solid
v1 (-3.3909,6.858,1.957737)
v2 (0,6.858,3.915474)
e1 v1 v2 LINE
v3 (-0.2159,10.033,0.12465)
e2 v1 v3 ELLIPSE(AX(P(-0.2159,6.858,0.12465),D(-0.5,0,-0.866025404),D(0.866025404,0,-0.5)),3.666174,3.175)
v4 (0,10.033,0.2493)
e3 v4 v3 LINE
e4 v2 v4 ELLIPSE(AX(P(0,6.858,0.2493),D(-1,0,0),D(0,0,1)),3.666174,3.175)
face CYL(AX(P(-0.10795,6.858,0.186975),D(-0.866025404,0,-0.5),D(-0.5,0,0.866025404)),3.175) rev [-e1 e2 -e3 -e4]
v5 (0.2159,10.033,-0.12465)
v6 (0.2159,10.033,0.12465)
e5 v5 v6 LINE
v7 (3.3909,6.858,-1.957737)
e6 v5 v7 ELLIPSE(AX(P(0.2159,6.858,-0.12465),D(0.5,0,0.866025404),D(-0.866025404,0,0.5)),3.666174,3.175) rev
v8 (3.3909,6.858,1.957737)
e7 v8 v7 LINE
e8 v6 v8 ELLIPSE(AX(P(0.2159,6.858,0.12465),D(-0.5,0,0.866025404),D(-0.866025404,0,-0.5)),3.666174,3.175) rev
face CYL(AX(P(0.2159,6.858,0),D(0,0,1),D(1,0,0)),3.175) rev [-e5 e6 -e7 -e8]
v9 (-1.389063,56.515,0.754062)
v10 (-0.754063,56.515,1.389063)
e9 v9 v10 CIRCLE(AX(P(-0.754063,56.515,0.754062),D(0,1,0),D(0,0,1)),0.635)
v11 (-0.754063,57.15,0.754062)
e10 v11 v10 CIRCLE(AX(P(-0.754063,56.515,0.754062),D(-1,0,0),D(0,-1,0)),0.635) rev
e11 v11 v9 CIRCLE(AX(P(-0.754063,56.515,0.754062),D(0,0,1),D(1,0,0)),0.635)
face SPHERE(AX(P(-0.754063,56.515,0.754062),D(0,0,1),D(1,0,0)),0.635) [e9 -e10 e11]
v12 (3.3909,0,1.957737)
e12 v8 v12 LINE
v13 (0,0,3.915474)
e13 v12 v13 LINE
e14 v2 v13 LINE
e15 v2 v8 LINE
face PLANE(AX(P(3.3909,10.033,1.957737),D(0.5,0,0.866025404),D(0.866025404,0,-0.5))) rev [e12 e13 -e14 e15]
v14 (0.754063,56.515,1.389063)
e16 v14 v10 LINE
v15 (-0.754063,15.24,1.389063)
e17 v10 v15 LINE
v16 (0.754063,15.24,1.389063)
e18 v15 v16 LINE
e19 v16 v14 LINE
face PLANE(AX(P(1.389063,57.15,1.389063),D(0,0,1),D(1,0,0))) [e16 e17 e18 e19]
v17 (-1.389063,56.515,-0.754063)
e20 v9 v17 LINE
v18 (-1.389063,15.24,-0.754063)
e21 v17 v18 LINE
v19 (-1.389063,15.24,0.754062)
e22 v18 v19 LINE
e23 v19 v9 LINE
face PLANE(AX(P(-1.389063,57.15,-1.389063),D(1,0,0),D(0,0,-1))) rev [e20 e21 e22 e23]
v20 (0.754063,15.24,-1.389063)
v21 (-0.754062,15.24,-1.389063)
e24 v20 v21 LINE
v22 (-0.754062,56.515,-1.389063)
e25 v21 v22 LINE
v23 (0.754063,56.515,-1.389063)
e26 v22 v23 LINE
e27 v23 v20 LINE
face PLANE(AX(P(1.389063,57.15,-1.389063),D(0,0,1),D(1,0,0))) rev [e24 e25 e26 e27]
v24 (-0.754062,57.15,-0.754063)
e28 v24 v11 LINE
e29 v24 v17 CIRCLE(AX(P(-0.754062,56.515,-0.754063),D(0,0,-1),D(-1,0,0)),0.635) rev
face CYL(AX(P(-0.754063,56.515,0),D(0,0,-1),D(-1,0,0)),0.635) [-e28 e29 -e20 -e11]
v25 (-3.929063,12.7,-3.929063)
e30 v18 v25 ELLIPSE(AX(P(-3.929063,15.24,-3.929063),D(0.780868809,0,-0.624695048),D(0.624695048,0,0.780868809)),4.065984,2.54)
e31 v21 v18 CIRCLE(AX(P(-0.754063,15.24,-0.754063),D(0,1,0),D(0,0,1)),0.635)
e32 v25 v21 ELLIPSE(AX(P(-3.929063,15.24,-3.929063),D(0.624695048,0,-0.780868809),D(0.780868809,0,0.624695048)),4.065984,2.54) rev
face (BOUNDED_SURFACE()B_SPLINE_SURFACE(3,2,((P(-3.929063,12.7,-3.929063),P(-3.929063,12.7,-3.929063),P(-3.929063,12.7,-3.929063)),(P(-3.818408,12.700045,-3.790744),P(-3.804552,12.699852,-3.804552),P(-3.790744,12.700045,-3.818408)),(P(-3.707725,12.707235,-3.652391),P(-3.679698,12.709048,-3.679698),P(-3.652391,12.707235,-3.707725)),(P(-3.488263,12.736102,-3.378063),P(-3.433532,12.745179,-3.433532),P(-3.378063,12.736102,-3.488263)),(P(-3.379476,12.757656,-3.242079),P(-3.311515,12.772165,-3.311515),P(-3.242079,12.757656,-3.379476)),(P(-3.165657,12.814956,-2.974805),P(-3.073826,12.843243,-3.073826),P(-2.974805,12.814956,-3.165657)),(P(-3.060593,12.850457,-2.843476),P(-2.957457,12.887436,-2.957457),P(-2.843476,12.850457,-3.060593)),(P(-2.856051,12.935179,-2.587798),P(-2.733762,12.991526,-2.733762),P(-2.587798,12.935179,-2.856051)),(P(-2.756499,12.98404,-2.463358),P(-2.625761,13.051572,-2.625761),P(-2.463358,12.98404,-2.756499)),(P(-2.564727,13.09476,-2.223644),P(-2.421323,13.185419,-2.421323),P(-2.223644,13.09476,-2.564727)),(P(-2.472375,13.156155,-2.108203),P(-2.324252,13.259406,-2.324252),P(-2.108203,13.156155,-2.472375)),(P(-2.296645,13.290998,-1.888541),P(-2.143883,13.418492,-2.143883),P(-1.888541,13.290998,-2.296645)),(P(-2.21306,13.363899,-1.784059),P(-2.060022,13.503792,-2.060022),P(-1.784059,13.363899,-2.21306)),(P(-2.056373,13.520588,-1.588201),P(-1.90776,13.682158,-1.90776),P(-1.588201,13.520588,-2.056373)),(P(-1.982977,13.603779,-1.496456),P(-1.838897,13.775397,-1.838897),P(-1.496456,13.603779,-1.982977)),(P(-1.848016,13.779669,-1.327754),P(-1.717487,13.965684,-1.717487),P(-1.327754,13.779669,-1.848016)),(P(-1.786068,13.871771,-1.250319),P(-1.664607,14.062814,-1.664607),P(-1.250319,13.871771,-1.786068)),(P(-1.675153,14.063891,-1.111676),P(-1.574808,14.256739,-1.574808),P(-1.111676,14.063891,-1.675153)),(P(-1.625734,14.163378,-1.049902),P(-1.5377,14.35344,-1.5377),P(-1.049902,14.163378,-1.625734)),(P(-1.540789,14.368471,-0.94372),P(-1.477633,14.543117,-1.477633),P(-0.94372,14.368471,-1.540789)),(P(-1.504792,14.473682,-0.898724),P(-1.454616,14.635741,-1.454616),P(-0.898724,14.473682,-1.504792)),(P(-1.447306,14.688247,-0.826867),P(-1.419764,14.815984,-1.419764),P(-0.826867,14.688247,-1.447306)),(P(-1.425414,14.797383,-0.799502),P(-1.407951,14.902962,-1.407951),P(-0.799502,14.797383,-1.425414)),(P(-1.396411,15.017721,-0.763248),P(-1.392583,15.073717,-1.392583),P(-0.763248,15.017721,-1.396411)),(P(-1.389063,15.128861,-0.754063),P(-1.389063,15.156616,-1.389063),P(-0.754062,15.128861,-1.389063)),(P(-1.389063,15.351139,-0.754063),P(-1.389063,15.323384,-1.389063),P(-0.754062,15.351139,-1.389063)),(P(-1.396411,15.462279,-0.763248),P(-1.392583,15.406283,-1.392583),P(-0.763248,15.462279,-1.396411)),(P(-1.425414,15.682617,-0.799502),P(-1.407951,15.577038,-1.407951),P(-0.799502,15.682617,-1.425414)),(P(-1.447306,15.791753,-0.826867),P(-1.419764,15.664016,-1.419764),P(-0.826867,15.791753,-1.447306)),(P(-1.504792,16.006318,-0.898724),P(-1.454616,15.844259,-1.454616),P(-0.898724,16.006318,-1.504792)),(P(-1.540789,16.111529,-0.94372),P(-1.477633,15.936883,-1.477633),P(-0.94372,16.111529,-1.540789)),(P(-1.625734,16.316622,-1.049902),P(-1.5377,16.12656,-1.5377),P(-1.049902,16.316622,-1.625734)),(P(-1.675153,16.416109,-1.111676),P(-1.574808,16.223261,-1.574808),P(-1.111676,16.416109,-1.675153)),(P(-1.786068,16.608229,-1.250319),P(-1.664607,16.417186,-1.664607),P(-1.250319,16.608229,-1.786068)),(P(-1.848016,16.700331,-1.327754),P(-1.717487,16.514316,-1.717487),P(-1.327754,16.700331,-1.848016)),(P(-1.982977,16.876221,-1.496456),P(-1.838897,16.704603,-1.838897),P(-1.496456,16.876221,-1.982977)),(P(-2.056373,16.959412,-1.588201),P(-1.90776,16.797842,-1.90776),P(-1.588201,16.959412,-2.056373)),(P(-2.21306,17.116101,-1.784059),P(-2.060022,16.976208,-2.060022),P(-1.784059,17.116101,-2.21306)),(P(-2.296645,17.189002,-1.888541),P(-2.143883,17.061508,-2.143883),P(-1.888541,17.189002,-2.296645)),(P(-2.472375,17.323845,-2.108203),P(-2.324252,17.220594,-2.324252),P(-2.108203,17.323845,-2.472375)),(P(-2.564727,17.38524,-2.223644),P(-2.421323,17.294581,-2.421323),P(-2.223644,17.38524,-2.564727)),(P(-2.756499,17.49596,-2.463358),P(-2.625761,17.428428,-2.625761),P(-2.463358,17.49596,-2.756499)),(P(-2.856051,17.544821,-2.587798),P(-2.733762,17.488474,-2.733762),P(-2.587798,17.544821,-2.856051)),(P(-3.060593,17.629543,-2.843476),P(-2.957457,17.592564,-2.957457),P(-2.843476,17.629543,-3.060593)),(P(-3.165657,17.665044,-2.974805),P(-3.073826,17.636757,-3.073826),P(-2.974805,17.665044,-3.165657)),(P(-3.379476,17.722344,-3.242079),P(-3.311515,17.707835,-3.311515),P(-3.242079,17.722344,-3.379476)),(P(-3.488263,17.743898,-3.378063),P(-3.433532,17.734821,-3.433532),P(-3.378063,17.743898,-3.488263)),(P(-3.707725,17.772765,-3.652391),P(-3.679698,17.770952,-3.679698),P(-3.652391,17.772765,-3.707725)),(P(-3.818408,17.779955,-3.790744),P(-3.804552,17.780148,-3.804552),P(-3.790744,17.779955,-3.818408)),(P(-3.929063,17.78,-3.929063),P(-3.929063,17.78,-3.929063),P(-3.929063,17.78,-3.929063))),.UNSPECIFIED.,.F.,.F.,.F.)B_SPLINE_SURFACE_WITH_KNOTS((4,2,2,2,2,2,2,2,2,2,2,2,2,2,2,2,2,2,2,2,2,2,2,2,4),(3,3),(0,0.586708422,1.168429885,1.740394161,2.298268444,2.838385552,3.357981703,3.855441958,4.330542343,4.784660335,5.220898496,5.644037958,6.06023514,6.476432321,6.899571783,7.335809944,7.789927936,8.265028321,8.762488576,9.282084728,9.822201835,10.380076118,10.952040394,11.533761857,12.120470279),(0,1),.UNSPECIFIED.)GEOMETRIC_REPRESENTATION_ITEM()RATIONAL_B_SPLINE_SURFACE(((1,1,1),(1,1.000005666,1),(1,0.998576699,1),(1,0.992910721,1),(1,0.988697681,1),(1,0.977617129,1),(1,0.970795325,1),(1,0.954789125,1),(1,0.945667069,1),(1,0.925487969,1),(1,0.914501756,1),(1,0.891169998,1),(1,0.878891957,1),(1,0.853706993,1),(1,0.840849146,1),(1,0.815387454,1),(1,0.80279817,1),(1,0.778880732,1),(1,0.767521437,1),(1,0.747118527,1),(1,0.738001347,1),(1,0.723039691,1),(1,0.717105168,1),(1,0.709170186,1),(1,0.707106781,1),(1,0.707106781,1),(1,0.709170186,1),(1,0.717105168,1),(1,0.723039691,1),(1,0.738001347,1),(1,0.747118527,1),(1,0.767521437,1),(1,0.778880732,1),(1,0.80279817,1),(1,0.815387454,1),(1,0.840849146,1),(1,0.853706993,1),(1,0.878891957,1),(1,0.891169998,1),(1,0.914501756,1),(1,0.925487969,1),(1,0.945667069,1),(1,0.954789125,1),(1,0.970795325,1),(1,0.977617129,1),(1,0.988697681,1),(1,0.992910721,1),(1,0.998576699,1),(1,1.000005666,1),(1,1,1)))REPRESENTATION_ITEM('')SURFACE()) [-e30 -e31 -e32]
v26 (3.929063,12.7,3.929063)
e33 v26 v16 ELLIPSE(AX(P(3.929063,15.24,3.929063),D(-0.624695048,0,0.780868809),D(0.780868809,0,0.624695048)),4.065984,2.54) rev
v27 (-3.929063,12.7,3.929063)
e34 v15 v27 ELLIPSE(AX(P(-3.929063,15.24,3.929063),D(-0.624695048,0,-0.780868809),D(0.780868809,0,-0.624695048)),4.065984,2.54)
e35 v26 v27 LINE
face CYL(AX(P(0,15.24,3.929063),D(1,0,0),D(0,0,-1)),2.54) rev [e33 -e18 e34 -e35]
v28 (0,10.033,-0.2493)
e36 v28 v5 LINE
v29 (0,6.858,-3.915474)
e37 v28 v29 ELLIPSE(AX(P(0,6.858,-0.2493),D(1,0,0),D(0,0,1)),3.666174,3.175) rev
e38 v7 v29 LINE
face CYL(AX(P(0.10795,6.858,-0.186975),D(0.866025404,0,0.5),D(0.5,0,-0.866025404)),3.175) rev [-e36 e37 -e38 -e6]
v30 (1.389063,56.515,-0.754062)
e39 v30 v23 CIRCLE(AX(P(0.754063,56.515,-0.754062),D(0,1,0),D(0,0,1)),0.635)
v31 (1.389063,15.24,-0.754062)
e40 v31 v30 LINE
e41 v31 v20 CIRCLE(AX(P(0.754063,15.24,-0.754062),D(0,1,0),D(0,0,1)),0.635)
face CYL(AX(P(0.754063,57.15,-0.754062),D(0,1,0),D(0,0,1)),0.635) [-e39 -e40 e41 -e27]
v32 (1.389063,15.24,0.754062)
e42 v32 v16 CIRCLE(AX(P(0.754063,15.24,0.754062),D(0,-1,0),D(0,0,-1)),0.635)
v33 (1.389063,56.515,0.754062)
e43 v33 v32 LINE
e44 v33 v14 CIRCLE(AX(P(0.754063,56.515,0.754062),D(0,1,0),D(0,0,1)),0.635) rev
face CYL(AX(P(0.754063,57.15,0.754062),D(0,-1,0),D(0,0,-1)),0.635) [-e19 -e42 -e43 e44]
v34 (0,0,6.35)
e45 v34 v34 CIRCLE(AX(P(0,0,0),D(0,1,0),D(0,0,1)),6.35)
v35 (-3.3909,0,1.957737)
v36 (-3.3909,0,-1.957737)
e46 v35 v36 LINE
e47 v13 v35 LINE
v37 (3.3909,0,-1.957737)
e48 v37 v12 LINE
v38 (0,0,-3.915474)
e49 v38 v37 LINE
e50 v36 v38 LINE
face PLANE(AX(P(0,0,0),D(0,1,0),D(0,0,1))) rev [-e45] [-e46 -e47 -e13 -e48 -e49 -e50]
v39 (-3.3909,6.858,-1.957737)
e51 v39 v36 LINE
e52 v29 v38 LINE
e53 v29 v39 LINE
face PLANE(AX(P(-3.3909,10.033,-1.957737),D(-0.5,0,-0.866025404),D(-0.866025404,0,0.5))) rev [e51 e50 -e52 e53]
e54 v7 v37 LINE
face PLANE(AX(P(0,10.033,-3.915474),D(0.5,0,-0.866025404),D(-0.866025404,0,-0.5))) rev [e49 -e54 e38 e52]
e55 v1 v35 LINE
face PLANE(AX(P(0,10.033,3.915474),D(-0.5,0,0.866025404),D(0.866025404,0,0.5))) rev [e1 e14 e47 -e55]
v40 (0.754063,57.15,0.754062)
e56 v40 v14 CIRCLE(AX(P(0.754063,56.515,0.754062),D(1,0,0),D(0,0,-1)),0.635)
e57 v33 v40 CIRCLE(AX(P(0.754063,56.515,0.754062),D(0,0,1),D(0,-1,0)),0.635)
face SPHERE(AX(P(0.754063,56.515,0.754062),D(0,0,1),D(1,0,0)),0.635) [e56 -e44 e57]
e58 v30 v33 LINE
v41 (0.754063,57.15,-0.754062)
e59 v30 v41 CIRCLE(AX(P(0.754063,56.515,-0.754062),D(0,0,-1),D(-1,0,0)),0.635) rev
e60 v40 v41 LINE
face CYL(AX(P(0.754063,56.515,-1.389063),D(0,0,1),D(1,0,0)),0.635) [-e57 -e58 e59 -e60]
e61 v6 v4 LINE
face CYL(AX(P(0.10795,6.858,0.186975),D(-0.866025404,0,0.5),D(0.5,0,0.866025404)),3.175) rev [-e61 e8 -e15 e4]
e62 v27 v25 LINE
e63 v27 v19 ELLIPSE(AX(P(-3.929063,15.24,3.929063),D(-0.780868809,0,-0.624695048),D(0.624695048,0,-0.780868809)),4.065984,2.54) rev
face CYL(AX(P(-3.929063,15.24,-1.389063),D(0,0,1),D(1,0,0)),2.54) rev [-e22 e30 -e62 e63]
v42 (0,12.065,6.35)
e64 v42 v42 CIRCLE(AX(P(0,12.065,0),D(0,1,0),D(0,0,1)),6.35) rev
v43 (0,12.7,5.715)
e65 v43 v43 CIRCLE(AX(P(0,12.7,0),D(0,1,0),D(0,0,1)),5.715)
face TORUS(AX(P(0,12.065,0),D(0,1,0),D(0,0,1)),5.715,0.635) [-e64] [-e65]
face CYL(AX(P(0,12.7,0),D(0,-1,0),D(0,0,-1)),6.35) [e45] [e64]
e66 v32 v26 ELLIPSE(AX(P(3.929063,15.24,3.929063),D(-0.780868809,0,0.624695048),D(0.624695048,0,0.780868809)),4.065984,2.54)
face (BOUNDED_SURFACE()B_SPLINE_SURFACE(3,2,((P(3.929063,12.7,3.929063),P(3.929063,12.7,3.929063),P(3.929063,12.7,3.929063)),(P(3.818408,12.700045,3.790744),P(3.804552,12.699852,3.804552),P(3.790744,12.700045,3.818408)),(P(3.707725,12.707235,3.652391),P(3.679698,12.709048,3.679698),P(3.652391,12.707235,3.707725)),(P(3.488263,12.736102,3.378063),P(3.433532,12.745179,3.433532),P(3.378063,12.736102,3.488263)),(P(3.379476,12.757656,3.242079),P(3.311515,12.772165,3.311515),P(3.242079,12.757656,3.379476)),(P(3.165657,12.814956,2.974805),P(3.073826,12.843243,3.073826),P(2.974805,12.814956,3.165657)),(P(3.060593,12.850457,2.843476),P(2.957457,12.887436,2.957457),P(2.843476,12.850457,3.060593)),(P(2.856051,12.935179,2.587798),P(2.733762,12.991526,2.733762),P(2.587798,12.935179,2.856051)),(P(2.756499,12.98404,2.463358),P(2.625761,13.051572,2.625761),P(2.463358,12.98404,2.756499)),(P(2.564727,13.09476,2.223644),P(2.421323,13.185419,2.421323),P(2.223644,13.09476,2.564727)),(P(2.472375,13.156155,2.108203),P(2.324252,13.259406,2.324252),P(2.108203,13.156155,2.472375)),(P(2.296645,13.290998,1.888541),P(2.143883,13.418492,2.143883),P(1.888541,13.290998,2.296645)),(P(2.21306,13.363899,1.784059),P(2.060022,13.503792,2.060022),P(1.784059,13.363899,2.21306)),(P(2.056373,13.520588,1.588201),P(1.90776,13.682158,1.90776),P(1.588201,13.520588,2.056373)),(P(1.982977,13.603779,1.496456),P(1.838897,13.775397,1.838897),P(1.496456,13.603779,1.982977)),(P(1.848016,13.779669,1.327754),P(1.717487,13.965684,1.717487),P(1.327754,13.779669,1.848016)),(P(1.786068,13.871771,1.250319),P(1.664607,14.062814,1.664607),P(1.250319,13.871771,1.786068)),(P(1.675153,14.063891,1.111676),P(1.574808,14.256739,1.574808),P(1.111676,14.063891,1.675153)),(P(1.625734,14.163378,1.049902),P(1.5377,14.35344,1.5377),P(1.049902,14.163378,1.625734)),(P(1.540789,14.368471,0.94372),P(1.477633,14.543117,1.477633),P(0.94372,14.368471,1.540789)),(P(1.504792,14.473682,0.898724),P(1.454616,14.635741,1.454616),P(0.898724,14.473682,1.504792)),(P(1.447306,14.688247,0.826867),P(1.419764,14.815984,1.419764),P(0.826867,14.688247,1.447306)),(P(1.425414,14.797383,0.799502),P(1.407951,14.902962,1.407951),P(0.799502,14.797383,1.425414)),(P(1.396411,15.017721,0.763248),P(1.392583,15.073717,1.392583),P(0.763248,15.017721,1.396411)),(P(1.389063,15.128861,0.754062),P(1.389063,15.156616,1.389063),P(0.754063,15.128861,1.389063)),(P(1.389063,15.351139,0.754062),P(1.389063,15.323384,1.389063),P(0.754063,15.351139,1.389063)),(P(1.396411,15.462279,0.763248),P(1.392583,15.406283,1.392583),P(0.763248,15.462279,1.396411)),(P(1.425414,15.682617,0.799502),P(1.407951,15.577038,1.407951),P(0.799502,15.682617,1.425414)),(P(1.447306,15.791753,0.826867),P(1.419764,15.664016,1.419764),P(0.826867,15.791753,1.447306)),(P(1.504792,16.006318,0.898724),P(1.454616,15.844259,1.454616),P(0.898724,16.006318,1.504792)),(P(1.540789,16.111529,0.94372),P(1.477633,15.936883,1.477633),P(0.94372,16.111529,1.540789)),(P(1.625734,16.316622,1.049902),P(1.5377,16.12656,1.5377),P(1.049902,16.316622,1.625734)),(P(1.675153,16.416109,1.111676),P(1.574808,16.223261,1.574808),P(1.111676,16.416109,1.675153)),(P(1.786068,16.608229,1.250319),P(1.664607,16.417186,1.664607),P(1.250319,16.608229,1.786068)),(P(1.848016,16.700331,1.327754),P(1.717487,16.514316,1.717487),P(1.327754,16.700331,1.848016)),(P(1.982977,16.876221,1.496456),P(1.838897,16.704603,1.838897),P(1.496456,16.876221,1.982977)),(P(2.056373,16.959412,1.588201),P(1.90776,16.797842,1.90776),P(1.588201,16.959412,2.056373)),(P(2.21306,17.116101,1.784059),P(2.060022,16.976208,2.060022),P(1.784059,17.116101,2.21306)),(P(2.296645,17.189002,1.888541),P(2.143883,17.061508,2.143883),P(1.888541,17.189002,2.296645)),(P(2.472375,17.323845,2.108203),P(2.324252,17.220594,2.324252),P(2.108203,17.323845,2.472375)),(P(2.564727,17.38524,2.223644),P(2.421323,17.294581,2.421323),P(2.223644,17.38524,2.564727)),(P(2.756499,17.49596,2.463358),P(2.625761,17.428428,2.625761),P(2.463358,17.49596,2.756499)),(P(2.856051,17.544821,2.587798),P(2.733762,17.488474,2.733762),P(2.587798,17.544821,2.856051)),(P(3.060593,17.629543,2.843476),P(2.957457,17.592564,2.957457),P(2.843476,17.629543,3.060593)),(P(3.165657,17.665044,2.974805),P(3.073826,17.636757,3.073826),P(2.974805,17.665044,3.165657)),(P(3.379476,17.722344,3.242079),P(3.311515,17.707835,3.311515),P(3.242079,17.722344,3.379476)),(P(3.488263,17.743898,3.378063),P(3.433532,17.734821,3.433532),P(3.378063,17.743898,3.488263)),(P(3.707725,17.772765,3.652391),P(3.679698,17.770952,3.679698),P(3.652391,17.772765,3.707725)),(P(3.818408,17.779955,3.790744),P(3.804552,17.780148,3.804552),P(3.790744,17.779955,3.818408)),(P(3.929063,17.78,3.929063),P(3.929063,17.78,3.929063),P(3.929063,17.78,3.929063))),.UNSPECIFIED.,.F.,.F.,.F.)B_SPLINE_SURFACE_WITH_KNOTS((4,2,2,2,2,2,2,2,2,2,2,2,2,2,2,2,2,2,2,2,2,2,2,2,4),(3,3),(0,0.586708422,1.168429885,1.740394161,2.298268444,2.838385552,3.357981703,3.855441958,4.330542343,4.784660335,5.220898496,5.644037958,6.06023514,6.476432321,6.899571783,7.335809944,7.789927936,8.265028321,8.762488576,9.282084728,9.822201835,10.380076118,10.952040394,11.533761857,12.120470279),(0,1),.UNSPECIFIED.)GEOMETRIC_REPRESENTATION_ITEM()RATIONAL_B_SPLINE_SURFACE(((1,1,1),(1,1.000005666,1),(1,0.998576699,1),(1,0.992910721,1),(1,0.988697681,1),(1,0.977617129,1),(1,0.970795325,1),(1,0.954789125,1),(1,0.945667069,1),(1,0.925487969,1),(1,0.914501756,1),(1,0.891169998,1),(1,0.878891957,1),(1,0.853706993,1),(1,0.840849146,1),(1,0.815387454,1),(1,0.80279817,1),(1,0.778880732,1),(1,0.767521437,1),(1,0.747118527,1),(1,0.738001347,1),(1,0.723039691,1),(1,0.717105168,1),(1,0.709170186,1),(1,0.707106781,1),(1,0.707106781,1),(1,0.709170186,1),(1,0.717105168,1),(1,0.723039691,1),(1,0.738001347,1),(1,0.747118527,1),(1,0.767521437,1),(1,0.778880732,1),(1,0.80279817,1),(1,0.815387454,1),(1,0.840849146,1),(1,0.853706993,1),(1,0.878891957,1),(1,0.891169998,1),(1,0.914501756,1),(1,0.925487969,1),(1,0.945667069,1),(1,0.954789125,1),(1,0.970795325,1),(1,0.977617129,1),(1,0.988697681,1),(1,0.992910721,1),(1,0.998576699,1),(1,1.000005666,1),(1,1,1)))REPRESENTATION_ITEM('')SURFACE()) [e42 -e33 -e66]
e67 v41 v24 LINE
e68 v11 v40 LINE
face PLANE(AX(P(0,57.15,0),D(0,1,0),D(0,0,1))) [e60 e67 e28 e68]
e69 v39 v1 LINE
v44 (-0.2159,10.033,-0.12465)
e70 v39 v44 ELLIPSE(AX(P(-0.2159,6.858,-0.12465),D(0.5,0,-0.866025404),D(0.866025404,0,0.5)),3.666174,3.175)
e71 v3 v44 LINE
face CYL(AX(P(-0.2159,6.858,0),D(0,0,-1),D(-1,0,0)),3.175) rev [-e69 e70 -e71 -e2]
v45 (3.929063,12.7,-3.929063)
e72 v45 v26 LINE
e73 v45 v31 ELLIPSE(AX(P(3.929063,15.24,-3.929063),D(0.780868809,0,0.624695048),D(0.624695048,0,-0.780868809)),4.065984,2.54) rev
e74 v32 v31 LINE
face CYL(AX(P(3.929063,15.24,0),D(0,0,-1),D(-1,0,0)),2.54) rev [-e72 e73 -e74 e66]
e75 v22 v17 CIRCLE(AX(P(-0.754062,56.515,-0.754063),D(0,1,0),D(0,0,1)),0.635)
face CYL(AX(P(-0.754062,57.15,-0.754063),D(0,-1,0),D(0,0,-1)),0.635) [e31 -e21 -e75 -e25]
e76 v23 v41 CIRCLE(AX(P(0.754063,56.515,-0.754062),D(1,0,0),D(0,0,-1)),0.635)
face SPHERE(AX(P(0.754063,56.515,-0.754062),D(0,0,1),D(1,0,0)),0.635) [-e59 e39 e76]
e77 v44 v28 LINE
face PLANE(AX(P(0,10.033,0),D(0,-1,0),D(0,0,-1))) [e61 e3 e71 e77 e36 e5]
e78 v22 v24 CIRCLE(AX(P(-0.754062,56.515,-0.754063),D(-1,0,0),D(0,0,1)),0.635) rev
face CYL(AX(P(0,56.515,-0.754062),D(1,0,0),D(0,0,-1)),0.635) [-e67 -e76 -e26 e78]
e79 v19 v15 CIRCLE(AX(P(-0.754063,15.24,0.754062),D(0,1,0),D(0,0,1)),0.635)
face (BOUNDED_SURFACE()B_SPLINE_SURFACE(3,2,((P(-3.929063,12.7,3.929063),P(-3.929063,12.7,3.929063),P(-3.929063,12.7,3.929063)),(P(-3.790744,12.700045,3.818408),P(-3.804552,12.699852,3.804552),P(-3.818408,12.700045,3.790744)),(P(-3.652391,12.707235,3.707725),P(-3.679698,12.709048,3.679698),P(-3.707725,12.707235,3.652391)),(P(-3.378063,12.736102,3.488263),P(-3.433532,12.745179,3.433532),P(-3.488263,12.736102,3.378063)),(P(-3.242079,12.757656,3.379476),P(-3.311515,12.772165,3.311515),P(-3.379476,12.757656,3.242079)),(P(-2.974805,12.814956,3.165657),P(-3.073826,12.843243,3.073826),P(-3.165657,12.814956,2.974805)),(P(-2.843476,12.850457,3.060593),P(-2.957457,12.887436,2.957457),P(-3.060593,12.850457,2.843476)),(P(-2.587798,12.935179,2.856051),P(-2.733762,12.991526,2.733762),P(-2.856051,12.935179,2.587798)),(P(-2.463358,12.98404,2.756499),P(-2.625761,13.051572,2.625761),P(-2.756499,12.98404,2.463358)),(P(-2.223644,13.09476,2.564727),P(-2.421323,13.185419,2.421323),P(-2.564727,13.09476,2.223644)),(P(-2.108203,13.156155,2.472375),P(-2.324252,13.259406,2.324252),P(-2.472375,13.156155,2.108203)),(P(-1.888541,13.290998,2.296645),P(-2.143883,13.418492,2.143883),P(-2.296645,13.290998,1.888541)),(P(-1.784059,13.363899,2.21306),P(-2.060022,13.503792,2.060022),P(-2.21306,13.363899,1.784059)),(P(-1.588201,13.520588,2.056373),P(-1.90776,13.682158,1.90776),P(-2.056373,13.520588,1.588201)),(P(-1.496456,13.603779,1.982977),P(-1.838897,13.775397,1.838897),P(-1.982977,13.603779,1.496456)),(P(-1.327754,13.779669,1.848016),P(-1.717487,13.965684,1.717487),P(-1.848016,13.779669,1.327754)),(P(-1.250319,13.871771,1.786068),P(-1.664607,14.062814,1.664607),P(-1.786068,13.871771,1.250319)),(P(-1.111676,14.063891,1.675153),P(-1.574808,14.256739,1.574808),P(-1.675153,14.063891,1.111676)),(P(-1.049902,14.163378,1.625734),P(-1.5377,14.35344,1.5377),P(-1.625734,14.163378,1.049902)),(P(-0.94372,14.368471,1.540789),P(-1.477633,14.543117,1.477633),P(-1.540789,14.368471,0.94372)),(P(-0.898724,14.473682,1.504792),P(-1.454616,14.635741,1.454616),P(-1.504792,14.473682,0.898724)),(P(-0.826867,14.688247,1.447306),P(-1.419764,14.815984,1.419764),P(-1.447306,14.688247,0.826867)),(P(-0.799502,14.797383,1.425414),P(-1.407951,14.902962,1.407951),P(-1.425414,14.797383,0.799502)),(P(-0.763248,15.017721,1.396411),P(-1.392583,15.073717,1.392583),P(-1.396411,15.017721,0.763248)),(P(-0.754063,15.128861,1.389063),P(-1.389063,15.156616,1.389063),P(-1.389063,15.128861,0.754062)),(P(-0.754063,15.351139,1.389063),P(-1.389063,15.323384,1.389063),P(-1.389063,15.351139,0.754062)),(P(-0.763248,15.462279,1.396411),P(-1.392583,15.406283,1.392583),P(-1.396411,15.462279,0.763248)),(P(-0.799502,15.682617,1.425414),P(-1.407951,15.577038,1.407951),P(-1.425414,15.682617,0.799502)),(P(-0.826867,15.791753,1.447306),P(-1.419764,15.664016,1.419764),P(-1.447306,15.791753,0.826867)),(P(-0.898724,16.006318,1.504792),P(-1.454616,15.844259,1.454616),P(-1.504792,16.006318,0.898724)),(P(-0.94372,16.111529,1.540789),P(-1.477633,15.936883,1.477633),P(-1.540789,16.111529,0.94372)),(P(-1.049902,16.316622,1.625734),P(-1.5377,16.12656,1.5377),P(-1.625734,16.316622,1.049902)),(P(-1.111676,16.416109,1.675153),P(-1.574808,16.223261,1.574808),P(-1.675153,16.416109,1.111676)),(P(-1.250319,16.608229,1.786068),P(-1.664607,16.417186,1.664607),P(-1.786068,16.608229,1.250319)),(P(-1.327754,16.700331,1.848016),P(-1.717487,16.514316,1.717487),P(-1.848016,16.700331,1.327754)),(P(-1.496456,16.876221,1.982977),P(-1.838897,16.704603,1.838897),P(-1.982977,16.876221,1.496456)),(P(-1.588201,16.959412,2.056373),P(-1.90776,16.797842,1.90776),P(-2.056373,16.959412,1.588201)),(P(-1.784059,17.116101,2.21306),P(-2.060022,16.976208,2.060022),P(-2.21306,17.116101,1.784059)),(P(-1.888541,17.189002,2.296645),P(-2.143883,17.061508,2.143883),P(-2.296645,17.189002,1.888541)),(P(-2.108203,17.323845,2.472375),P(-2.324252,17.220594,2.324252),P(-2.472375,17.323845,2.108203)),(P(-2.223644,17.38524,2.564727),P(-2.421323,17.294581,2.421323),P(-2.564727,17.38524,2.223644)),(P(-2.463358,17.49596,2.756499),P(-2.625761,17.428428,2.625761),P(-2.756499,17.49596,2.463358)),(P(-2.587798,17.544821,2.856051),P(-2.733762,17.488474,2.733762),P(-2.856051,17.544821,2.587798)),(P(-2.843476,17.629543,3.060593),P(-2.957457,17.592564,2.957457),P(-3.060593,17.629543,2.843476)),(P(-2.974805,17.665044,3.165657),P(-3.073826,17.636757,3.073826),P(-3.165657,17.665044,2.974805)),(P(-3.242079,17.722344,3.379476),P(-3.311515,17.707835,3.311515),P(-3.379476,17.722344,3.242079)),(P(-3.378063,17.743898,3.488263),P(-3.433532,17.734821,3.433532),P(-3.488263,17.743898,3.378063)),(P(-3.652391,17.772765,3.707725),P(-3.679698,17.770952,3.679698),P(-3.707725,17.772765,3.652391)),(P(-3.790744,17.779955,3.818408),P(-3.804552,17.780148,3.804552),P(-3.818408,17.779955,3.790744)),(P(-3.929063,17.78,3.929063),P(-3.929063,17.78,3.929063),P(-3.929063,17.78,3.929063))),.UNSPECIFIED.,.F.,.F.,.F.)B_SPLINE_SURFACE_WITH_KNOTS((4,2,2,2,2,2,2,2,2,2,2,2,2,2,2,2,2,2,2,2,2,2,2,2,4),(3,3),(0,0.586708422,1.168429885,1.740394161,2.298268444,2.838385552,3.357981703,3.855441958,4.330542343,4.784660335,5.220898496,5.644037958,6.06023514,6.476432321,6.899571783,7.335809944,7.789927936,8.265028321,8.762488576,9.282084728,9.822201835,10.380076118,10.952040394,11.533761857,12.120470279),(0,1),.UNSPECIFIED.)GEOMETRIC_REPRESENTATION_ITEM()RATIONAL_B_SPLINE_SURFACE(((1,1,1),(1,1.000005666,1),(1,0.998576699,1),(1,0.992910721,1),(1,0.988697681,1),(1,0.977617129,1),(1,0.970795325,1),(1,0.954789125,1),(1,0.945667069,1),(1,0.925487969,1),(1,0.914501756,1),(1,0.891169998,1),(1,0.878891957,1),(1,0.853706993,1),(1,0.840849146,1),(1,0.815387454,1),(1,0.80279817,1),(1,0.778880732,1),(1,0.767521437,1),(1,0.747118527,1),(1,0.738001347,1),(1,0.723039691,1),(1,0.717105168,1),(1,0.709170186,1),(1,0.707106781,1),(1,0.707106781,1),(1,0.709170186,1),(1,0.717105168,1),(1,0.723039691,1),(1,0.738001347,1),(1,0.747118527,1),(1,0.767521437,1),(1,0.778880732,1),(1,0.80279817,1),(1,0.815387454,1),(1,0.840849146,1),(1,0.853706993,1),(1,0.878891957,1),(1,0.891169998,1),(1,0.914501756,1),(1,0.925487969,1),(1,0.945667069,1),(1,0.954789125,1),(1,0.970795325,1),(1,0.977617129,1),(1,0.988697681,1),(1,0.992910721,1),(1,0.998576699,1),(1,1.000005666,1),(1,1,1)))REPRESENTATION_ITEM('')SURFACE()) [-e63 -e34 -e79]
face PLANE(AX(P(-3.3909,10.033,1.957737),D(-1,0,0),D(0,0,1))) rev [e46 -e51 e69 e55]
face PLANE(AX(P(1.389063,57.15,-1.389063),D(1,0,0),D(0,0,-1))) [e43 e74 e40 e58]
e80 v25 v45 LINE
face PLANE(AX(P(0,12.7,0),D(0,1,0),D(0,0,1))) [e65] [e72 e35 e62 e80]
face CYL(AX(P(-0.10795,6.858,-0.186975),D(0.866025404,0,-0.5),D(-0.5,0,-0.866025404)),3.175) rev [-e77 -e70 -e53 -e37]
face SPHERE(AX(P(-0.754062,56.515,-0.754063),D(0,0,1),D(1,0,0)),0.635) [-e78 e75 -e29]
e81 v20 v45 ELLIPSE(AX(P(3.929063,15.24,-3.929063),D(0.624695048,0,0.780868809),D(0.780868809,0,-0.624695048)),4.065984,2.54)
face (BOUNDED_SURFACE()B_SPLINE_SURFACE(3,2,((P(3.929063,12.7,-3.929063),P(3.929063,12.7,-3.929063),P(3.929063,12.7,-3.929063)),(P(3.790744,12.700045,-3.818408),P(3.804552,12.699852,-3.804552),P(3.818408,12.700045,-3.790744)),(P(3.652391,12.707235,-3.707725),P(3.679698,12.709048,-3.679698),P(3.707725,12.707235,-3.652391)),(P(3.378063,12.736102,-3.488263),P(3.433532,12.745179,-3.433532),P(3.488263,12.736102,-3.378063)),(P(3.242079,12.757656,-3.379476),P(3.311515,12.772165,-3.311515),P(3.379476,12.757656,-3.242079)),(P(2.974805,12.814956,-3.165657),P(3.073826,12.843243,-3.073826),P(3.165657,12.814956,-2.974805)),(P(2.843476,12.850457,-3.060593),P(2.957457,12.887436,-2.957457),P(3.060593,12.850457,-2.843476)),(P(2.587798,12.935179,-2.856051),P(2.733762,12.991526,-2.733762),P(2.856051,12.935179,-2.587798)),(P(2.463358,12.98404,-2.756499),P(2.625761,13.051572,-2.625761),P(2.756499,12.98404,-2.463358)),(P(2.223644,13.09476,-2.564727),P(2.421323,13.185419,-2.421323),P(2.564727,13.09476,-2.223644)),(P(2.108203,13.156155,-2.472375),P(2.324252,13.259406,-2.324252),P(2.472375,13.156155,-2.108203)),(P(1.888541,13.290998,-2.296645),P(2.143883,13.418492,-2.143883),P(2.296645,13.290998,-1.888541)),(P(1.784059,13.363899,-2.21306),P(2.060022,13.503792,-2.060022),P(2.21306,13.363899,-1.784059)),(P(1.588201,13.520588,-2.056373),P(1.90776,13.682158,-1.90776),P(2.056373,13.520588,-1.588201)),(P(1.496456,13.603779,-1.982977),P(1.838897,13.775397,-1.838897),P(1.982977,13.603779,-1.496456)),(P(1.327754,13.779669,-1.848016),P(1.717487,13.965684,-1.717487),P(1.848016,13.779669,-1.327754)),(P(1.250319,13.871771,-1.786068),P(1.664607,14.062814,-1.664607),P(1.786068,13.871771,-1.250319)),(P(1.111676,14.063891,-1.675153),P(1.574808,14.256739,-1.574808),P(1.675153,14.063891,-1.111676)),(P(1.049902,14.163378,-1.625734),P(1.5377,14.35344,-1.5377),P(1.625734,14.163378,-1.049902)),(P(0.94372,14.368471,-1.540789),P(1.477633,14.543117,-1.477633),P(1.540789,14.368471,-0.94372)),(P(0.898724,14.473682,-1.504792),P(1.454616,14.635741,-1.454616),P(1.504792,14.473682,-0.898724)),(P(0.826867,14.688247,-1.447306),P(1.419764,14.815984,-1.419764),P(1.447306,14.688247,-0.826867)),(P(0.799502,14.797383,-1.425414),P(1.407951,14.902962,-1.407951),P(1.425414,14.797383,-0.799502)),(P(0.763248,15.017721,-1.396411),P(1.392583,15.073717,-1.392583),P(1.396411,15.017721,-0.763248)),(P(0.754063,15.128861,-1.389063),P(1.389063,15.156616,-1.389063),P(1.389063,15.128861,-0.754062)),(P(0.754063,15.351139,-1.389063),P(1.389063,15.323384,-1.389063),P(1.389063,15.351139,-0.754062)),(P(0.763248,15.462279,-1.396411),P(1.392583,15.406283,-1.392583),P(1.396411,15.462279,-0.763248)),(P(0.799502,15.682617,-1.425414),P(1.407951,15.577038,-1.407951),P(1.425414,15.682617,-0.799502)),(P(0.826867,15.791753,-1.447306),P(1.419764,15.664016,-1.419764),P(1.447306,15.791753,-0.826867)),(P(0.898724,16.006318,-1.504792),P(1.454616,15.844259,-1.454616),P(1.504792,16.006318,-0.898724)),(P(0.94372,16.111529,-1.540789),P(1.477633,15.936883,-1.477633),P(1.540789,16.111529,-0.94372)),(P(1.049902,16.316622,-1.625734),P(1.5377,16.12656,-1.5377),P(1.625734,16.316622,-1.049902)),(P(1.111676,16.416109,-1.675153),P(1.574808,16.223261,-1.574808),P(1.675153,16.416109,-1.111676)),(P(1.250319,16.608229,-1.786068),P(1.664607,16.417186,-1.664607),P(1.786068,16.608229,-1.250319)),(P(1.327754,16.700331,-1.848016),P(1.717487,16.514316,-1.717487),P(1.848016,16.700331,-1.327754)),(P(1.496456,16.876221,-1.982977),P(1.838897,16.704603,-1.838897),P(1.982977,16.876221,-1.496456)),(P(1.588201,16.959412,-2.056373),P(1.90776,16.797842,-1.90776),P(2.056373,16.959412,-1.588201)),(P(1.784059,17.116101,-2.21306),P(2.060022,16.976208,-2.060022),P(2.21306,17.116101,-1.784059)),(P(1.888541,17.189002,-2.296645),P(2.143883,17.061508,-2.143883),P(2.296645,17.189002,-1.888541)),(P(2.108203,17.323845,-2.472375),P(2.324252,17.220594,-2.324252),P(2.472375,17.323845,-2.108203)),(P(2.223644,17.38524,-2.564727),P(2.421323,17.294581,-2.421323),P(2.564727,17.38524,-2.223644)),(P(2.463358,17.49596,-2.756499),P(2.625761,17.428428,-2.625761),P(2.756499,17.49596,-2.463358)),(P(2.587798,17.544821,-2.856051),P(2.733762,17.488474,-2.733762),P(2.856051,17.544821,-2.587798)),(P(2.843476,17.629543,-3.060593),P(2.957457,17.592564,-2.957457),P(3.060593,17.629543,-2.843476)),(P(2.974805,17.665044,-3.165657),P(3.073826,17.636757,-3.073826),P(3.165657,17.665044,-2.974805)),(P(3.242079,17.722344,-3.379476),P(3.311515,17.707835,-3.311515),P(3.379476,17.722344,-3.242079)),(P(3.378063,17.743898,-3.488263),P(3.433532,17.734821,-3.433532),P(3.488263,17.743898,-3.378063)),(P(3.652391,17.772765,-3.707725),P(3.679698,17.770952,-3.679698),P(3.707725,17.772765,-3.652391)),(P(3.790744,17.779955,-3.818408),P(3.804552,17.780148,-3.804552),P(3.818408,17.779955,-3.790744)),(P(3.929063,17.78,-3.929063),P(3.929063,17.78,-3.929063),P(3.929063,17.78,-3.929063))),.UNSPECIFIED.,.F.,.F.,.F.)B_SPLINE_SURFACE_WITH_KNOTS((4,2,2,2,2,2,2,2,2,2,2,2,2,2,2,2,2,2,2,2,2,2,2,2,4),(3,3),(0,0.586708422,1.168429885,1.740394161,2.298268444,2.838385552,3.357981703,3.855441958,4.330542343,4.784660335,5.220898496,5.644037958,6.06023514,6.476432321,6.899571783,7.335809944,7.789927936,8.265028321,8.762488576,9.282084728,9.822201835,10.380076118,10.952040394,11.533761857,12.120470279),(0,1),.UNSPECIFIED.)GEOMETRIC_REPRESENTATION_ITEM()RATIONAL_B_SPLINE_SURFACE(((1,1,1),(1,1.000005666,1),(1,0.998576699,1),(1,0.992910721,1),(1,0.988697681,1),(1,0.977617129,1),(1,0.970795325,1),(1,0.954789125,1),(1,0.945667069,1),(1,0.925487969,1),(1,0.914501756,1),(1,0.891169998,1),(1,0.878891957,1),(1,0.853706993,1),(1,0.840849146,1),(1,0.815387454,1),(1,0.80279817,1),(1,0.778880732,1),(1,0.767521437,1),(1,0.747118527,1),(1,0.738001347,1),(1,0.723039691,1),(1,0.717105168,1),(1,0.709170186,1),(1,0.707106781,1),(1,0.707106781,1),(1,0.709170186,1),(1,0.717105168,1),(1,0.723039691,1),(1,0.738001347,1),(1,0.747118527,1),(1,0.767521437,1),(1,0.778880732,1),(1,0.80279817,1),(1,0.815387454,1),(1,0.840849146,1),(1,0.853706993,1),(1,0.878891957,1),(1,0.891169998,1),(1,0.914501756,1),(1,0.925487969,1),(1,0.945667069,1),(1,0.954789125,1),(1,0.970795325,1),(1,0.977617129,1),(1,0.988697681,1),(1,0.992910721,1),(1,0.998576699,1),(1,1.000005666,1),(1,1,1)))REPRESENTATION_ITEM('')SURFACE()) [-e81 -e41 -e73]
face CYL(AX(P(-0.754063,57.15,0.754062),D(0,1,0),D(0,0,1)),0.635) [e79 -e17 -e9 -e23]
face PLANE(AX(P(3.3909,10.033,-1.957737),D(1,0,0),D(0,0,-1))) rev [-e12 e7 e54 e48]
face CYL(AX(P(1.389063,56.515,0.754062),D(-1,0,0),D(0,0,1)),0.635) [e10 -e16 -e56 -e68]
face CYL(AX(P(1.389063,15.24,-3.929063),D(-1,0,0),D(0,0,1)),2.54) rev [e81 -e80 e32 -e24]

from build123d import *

# Parameters (mm, degrees)
SKETCH1_R           = 6.35
BOSS_EXTRUDE1_DEPTH = 12.7
SKETCH2_W           = 2.778125
SKETCH2_H           = 2.778125
BOSS_EXTRUDE2_DEPTH = 44.45
FILLET1_R           = 2.54
FILLET2_R           = 0.635
CUT_EXTRUDE1_DEPTH  = 10.033
FILLET3_R           = 3.175


with BuildPart() as part:
    # Sketch1 → Boss-Extrude1 (new body)
    with BuildSketch(Plane(origin=(0, 0, 0), x_dir=(0, 0, -1), z_dir=(0, 1, 0))):
        Circle(SKETCH1_R)
    extrude(amount=BOSS_EXTRUDE1_DEPTH)

    # Sketch2 → Boss-Extrude2 (add)
    with BuildSketch(Plane(origin=(-12.7, 12.7, 0), x_dir=(0, 0, -1), z_dir=(0, -1, 0))):
        with Locations((0, 12.7)):
            Rectangle(SKETCH2_W, SKETCH2_H)
    extrude(amount=-BOSS_EXTRUDE2_DEPTH)

    # Fillet1
    fillet1_edges = [part.edges().sort_by_distance(p)[0] for p in [
        (0, 12.7, 1.3890625),
        (-1.3890625, 12.7, 0),
        (0, 12.7, -1.3890625),
        (1.3890625, 12.7, 0),
    ]]
    fillet(fillet1_edges, radius=FILLET1_R)

    # Fillet2
    fillet2_edges = [part.edges().sort_by_distance(p)[0] for p in [
        (2.288098215, 13.301228168, 2.288098215),
        (-2.288098198, 13.301228182, 2.288098198),
        (2.288098275, 13.301228117, -2.288098275),
        (-2.288098218, 13.301228166, -2.288098218),
        (1.3890625, 36.195, 1.3890625),
        (-1.3890625, 36.195, 1.3890625),
        (1.3890625, 36.195, -1.3890625),
        (-1.3890625, 36.195, -1.3890625),
        (0, 12.7, 6.35),
        (0, 57.15, -1.3890625),
        (1.3890625, 57.15, 0),
        (0, 57.15, 1.3890625),
        (-1.3890625, 57.15, 0),
    ]]
    fillet(fillet2_edges, radius=FILLET2_R)

    # Sketch3 → Cut-Extrude1 (cut)
    with BuildSketch(Plane.XZ):
        Polygon((-3.3909, 1.957737028), (-3.3909, -1.957737028), (0, -3.915474056), (3.3909, -1.957737028), (3.3909, 1.957737028), (0, 3.915474056), align=None)
    extrude(amount=-CUT_EXTRUDE1_DEPTH, mode=Mode.SUBTRACT)

    # Fillet3
    fillet3_edges = [part.edges().sort_by_distance(p)[0] for p in [
        (1.69545, 10.033, 2.936605542),
        (3.3909, 10.033, 0),
        (1.69545, 10.033, -2.936605542),
        (-1.69545, 10.033, -2.936605542),
        (-3.3909, 10.033, 0),
        (-1.69545, 10.033, 2.936605542),
    ]]
    fillet(fillet3_edges, radius=FILLET3_R)


solid = part.part
